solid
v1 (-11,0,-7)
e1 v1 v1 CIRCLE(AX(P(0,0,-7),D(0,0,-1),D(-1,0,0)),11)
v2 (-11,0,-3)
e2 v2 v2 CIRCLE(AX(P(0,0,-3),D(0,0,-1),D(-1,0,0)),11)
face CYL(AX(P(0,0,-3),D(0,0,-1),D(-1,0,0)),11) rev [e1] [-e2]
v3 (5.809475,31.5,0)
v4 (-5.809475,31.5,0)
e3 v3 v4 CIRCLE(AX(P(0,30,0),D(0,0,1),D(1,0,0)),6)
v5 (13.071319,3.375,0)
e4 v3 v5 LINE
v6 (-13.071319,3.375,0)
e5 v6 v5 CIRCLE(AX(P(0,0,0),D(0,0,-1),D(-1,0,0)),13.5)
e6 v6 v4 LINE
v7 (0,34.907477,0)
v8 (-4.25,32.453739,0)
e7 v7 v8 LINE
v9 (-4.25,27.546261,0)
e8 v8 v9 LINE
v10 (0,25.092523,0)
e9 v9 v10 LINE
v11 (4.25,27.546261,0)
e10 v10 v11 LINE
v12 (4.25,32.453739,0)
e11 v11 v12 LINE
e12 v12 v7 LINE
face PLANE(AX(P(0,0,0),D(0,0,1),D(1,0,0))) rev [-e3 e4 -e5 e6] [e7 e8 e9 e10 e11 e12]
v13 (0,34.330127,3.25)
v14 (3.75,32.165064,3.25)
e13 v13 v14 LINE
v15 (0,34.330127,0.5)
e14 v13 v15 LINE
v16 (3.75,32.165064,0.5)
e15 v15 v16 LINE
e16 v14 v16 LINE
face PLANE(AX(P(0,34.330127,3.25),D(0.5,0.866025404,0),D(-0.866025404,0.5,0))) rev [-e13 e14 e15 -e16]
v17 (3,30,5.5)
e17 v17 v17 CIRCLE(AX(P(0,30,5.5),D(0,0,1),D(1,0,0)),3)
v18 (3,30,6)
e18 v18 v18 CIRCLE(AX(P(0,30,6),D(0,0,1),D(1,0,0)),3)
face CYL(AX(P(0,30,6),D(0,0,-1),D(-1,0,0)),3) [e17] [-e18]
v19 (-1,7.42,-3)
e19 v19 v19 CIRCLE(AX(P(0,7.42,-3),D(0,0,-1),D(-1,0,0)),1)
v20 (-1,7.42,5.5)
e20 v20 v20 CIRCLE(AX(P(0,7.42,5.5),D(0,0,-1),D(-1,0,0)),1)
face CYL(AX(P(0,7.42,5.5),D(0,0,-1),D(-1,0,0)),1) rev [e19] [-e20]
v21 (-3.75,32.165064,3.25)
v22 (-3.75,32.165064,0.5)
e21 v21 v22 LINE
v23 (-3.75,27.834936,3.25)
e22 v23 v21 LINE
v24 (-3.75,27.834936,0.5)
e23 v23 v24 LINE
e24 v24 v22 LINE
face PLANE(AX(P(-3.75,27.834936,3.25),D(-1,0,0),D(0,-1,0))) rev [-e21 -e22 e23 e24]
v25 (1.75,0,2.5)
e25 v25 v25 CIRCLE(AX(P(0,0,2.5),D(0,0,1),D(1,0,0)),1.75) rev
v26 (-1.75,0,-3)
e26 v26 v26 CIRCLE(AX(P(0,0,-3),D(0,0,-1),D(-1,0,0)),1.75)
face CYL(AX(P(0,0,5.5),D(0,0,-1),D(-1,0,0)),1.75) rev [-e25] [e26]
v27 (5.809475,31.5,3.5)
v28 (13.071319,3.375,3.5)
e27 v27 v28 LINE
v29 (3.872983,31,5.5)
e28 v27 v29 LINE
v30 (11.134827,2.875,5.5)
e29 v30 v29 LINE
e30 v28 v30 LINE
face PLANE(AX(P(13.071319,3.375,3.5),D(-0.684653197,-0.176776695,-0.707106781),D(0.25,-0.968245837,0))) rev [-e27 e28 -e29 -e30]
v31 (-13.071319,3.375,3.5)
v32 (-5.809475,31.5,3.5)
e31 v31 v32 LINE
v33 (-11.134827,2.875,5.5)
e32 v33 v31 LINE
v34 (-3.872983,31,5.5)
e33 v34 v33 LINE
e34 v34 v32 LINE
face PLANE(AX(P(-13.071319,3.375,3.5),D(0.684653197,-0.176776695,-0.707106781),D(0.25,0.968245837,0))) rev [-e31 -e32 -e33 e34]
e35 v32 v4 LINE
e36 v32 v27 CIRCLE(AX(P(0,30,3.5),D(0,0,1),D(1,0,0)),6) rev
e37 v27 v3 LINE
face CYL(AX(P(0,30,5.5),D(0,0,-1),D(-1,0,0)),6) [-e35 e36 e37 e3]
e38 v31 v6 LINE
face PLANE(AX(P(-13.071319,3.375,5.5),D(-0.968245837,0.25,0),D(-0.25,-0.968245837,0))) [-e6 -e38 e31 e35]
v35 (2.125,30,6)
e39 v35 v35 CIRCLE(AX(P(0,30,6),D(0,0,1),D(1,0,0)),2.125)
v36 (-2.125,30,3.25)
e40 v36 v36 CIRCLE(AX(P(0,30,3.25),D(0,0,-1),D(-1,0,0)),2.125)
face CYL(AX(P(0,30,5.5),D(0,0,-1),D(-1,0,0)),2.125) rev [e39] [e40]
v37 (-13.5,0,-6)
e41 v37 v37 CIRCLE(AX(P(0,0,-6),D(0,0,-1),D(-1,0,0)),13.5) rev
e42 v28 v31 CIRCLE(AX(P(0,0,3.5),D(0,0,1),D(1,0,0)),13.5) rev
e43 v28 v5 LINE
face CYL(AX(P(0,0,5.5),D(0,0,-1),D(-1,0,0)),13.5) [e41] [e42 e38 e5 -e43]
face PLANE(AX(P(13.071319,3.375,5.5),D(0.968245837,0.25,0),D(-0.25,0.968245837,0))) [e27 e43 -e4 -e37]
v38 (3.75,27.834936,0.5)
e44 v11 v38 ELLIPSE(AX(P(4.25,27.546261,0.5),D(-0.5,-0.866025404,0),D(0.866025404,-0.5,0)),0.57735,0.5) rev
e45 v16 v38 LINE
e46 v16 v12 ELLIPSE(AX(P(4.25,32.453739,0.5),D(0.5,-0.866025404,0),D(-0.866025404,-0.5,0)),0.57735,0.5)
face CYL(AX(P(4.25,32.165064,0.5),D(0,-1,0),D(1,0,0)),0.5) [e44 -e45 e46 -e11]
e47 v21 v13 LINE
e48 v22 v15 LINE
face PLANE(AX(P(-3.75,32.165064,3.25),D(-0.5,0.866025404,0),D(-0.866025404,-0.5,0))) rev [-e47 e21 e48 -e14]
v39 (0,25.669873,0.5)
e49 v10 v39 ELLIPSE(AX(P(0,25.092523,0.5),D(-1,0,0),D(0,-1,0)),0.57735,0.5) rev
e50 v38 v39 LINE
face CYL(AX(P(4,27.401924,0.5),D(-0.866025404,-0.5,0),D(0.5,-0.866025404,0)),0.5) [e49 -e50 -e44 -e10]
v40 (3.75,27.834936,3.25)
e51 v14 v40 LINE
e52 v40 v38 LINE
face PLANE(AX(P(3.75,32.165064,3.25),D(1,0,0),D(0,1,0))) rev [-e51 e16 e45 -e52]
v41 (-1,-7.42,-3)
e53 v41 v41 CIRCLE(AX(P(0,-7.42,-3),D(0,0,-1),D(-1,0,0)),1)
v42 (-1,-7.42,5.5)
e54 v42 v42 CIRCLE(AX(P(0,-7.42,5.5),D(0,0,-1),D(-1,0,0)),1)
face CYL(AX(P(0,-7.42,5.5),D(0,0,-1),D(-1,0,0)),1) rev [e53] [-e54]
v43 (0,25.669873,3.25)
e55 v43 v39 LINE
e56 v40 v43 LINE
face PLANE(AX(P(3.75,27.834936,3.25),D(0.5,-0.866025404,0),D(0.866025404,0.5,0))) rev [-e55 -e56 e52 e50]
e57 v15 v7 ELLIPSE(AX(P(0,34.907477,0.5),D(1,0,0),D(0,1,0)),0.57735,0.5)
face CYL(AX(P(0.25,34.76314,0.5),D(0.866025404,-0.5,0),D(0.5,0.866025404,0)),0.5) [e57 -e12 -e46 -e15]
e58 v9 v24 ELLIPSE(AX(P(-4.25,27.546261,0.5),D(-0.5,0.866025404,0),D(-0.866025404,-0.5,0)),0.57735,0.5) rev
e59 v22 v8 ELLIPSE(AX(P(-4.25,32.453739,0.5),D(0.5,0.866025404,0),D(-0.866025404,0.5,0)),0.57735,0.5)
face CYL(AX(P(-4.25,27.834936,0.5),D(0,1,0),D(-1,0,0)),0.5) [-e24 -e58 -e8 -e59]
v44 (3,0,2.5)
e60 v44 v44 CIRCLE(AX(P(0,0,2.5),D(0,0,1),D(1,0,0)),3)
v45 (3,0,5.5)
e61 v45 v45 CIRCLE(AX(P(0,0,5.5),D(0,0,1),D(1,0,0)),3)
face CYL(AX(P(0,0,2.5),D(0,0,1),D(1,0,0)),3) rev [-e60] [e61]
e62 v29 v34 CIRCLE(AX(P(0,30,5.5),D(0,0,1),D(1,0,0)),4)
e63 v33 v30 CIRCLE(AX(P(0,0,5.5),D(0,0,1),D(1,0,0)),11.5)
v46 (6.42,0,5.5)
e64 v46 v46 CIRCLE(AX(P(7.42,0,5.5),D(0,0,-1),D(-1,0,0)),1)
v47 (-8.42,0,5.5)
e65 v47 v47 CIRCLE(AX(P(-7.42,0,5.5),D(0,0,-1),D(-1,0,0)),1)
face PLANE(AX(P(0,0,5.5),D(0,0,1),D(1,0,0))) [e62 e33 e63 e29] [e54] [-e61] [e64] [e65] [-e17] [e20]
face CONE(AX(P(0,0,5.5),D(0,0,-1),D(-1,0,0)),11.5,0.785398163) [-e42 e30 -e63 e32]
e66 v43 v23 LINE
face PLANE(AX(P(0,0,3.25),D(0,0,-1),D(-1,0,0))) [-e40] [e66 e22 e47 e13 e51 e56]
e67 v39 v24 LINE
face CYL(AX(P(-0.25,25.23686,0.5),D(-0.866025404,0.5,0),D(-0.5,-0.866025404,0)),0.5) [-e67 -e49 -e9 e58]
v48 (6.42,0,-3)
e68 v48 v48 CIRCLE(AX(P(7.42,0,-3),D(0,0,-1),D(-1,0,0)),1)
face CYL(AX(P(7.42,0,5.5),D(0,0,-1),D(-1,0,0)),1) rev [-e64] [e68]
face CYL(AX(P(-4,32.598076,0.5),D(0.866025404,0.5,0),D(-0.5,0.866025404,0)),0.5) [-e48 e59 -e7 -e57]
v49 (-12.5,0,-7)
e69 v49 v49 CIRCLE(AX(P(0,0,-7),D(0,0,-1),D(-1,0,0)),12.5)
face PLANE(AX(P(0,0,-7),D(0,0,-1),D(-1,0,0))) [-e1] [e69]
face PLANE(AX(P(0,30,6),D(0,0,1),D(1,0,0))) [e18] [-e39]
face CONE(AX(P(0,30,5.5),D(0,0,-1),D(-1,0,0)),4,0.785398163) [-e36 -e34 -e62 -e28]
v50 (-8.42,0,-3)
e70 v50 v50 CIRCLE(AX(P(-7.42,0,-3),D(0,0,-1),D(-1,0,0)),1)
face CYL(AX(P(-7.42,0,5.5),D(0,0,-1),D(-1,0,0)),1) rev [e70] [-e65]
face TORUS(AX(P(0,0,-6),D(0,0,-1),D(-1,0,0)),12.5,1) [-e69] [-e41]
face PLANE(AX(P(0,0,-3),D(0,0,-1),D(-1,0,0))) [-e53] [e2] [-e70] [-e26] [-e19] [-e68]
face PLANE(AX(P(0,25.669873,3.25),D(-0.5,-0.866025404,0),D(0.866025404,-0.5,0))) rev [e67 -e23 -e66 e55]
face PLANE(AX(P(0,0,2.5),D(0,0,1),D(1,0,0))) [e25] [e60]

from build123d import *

# Parameters (mm, degrees)
SKETCH1_R           = 2.125
BOSS_EXTRUDE1_DEPTH = 5.5
BOSS_EXTRUDE2_START = 7
SKETCH4_R           = 13.5
BOSS_EXTRUDE2_DEPTH = 7
SKETCH6_R           = 11
CUT_EXTRUDE4_DEPTH  = 4
SKETCH5_R           = 1
SKETCH5_R_2         = 1.75
CUT_EXTRUDE2_DEPTH  = 40.376388864
CHAMFER1_SIZE       = 2
SKETCH7_R           = 3
CUT_EXTRUDE5_DEPTH  = 3
FILLET1_R           = 1
SKETCH8_R           = 3
SKETCH8_R_2         = 2.125
BOSS_EXTRUDE3_DEPTH = 0.5
CUT_EXTRUDE6_DEPTH  = 3.25
FILLET2_R           = 0.5


with BuildPart() as part:
    # Sketch1 → Boss-Extrude1 (new body)
    with BuildSketch(Plane.XY):
        with BuildLine():
            Line((-5.809475019, 31.5), (-13.071318793, 3.375))
            ThreePointArc((-13.071318793, 3.375), (0, -13.5), (13.071318793, 3.375))
            Line((13.071318793, 3.375), (5.809475019, 31.5))
            ThreePointArc((5.809475019, 31.5), (0, 36), (-5.809475019, 31.5))
        make_face()
        with Locations((0, 30)):
            Circle(SKETCH1_R, mode=Mode.SUBTRACT)
    extrude(amount=BOSS_EXTRUDE1_DEPTH)

    # Sketch4 → Boss-Extrude2 (add)
    with BuildSketch(Plane(origin=(0, 0, 0), x_dir=(-1, 0, 0), z_dir=(0, 0, -1)).offset(BOSS_EXTRUDE2_START)):
        Circle(SKETCH4_R)
    extrude(amount=-BOSS_EXTRUDE2_DEPTH)

    # Sketch6 → Cut-Extrude4 (cut)
    with BuildSketch(Plane(origin=(0, 0, -7), x_dir=(-1, 0, 0), z_dir=(0, 0, -1))):
        Circle(SKETCH6_R)
    extrude(amount=-CUT_EXTRUDE4_DEPTH, mode=Mode.SUBTRACT)

    # Sketch5 → Cut-Extrude2 (cut, through all)
    with BuildSketch(Plane(origin=(0, 0, -3), x_dir=(-1, 0, 0), z_dir=(0, 0, -1))):
        with Locations((7.42, 0)):
            Circle(SKETCH5_R)
        with Locations((0, -7.42)):
            Circle(SKETCH5_R)
        with Locations((-7.42, 0)):
            Circle(SKETCH5_R)
        with Locations((0, 7.42)):
            Circle(SKETCH5_R)
        Circle(SKETCH5_R_2)
    extrude(amount=-CUT_EXTRUDE2_DEPTH, mode=Mode.SUBTRACT)

    # Chamfer1
    chamfer1_edges = [part.edges().sort_by_distance(p)[0] for p in [
        (0, -13.5, 5.5),
        (-9.440396906, 17.4375, 5.5),
        (0, 36, 5.5),
        (9.440396906, 17.4375, 5.5),
    ]]
    chamfer(chamfer1_edges, length=CHAMFER1_SIZE)

    # Sketch7 → Cut-Extrude5 (cut)
    with BuildSketch(Plane.XY.offset(5.5)):
        Circle(SKETCH7_R)
    extrude(amount=-CUT_EXTRUDE5_DEPTH, mode=Mode.SUBTRACT)

    # Fillet1
    fillet1_edges = [part.edges().sort_by_distance(p)[0] for p in [
        (13.5, 0, -7),
    ]]
    fillet(fillet1_edges, radius=FILLET1_R)

    # Sketch8 → Boss-Extrude3 (add)
    with BuildSketch(Plane.XY.offset(5.5)):
        with Locations((0, 30)):
            Circle(SKETCH8_R)
        with Locations((0, 30)):
            Circle(SKETCH8_R_2, mode=Mode.SUBTRACT)
    extrude(amount=BOSS_EXTRUDE3_DEPTH)

    # Sketch9 → Cut-Extrude6 (cut)
    with BuildSketch(Plane(origin=(0, 0, 0), x_dir=(-1, 0, 0), z_dir=(0, 0, -1))):
        Polygon((0, 25.669872981), (3.75, 27.834936491), (3.75, 32.165063509), (0, 34.330127019), (-3.75, 32.165063509), (-3.75, 27.834936491), align=None)
    extrude(amount=-CUT_EXTRUDE6_DEPTH, mode=Mode.SUBTRACT)

    # Fillet2
    fillet2_edges = [part.edges().sort_by_distance(p)[0] for p in [
        (3.75, 30, 0),
        (1.875, 26.752404736, 0),
        (-1.875, 26.752404736, 0),
        (-3.75, 30, 0),
        (-1.875, 33.247595264, 0),
        (1.875, 33.247595264, 0),
    ]]
    fillet(fillet2_edges, radius=FILLET2_R)


solid = part.part
